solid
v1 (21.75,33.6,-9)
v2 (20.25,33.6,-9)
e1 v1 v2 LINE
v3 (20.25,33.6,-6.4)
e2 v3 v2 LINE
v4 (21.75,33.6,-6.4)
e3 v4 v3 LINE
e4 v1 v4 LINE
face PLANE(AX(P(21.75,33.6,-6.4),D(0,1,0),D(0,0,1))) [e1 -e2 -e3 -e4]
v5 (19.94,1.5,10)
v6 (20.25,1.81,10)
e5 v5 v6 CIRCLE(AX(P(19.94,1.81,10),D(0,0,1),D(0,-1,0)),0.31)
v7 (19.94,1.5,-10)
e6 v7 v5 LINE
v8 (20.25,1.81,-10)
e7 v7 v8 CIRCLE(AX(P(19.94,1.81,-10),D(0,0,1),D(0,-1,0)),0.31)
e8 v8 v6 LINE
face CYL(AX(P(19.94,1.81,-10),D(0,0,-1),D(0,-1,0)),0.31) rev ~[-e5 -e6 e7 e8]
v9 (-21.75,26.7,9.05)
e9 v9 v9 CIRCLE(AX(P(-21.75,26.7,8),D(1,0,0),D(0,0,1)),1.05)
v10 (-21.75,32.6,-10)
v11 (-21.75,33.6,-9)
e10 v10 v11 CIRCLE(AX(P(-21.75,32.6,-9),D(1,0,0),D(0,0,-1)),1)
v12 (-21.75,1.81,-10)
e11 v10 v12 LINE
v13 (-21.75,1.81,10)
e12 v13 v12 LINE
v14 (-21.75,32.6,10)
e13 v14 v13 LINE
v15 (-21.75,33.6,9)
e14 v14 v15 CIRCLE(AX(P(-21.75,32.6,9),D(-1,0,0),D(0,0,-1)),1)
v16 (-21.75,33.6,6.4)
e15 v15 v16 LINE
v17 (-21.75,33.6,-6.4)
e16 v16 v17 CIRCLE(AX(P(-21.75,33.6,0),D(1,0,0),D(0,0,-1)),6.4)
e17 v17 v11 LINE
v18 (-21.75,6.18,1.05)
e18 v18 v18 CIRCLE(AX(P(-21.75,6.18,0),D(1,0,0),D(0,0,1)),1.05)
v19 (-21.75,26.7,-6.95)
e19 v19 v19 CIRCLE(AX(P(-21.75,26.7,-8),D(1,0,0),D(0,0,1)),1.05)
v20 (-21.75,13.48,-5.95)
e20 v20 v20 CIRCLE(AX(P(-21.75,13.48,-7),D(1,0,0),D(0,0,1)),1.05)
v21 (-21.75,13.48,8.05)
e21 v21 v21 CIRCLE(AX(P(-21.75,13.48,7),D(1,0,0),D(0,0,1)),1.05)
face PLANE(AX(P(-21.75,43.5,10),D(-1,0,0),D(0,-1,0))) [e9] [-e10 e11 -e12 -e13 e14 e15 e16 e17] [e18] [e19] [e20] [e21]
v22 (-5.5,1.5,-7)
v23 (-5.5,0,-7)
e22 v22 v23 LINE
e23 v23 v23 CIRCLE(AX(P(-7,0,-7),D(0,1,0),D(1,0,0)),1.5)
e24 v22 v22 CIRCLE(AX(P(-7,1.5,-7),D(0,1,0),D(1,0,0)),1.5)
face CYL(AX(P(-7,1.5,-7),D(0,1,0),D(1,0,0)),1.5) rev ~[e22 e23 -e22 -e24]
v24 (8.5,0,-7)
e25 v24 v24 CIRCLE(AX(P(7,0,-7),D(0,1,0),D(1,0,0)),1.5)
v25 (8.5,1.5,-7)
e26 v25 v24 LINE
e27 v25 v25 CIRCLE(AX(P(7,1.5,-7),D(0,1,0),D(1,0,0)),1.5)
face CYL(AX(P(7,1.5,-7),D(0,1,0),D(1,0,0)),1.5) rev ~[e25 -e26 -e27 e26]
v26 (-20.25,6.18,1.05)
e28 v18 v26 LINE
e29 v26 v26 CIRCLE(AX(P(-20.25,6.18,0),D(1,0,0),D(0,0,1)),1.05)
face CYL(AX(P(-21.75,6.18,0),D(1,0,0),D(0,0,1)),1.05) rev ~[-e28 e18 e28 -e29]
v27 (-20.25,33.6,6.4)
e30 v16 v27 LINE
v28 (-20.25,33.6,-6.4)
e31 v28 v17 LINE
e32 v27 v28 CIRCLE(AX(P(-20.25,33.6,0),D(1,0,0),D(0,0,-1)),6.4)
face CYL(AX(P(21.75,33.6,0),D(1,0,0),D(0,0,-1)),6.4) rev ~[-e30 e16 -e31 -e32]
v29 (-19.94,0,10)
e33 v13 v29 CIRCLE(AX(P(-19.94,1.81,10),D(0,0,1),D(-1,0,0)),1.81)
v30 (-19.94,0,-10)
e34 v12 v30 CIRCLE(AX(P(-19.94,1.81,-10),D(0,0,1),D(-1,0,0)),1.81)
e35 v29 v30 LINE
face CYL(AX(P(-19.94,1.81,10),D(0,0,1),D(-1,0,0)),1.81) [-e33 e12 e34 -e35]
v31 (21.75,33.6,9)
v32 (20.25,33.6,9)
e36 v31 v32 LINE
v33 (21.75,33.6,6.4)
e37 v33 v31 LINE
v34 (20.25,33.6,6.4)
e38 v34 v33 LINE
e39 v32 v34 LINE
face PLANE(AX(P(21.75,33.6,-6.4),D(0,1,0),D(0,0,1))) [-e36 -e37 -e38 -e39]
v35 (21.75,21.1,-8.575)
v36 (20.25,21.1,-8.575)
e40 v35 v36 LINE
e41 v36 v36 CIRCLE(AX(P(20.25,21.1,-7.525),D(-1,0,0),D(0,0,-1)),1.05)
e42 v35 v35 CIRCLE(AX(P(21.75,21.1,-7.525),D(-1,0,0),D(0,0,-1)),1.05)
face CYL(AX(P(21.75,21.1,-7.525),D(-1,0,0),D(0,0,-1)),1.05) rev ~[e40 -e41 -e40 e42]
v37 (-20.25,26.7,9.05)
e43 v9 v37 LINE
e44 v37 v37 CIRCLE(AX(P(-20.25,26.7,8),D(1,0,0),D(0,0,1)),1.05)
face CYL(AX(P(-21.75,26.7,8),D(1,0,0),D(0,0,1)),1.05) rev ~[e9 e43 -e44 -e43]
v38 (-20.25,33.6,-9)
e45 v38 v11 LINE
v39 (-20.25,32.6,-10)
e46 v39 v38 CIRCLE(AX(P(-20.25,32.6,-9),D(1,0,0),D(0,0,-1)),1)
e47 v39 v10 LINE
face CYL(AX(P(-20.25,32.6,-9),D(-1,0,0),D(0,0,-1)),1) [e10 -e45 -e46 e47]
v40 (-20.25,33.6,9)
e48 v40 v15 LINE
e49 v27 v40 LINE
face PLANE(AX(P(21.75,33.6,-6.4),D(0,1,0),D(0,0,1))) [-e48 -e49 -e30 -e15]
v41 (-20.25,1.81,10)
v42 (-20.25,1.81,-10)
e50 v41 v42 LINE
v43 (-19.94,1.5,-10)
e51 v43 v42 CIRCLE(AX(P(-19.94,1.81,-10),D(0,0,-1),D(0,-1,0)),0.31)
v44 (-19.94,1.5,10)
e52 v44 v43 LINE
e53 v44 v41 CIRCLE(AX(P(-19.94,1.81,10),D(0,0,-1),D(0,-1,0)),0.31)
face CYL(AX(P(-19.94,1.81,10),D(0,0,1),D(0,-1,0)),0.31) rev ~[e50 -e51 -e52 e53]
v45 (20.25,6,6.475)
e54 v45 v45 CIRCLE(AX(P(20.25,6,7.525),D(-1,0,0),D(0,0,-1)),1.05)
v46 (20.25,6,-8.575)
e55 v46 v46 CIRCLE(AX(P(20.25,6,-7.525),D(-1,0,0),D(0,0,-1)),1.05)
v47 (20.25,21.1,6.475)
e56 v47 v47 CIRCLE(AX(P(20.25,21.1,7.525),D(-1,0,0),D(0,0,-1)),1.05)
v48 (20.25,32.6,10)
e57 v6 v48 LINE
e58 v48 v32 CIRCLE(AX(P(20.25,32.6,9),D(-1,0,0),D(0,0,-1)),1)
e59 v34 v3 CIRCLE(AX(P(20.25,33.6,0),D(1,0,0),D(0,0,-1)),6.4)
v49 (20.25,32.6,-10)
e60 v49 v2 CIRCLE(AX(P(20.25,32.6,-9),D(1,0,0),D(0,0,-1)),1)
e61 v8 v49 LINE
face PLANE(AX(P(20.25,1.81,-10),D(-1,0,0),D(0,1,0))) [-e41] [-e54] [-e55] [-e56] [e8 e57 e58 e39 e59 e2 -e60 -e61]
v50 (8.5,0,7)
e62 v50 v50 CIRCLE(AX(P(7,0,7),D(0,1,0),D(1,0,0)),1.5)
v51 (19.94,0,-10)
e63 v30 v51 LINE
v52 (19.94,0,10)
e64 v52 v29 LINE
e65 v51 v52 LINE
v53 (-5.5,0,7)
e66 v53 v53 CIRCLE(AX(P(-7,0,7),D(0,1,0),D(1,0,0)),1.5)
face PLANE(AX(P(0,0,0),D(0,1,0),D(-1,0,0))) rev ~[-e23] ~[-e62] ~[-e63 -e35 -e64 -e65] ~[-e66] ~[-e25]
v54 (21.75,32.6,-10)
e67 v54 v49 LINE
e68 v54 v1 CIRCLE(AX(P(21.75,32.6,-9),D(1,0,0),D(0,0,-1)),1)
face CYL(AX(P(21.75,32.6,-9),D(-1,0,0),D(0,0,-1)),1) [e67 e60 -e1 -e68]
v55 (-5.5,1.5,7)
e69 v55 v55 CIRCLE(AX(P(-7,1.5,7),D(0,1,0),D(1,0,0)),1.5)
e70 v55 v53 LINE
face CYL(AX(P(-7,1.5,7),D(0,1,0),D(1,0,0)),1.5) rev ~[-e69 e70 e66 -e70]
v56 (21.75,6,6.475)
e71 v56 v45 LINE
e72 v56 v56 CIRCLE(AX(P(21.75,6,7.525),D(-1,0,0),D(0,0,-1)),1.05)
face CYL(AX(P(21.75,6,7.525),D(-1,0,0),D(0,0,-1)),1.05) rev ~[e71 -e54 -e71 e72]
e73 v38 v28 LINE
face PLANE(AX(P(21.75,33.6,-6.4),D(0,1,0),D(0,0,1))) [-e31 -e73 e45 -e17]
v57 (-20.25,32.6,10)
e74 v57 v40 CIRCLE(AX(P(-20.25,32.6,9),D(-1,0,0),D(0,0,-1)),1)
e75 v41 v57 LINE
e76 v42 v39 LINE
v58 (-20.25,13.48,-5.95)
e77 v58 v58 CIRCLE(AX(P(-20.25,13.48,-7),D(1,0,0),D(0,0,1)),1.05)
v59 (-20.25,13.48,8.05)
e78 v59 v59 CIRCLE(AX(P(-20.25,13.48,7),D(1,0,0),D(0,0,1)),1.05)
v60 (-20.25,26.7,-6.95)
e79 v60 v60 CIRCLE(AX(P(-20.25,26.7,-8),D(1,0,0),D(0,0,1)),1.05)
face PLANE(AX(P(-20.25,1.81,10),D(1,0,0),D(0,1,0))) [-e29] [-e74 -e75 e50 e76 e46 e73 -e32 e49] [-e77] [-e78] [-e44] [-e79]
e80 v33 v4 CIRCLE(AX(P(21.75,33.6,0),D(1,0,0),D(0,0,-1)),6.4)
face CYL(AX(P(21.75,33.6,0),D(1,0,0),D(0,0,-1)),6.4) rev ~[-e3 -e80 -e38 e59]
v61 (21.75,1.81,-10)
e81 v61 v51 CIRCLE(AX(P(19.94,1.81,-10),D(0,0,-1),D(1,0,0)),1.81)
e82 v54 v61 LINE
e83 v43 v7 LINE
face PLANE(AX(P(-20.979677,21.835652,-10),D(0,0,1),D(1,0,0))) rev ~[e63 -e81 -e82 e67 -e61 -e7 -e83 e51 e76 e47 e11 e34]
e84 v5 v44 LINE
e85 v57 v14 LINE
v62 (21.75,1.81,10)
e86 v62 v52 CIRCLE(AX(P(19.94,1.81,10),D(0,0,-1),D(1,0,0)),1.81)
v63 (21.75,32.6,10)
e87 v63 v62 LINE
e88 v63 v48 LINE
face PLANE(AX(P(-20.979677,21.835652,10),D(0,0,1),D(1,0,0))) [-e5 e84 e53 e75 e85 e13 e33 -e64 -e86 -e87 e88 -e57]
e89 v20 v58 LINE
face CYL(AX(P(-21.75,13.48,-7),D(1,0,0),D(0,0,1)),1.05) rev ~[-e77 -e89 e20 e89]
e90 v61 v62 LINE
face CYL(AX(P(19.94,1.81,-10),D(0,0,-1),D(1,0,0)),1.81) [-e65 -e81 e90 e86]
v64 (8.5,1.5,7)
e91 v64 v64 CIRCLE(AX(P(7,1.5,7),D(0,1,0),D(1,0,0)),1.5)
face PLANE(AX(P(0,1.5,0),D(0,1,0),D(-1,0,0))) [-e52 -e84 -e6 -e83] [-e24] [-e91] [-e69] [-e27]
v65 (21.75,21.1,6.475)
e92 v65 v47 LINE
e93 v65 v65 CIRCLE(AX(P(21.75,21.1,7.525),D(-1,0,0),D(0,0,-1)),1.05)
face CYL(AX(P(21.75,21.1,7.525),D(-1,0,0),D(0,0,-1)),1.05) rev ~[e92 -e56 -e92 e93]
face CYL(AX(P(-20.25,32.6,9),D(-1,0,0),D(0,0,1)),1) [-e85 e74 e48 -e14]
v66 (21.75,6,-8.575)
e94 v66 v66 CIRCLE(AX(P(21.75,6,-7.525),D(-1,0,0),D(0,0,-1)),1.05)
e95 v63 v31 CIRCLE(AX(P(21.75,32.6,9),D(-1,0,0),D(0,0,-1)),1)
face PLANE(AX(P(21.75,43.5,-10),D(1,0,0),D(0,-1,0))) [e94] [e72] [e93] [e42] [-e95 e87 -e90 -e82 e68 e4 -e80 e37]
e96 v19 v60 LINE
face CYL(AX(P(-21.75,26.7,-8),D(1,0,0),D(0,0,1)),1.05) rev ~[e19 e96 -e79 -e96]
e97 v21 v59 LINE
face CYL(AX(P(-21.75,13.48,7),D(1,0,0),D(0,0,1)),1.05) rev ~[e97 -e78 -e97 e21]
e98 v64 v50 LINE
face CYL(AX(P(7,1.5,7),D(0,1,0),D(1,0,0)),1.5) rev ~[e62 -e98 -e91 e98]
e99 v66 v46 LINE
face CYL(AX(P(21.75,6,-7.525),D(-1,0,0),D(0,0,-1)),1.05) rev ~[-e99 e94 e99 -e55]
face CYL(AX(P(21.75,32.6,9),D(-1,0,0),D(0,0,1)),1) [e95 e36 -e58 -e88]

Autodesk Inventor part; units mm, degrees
ref_plane "YZ Plane" through (0, 0, 0) normal (1, 0, 0) x (0, 1, 0)
ref_plane "XZ Plane" through (0, 0, 0) normal (0, 1, 0) x (-1, 0, 0)
ref_plane "XY Plane" through (0, 0, 0) normal (0, 0, 1) x (1, 0, 0)
sketch "Sketch1" plane through (0, 0, 0) normal (0, 1, 0) x (-1, 0, 0)
  line L0 (20.25, -10) -> (-20.25, -10)
  line L1 (-20.25, -10) -> (-20.25, 10)
  line L2 (-20.25, 10) -> (20.25, 10)
  line L3 (20.25, 10) -> (20.25, -10)
  point P0 (0, 0)
  dimension "d0" = 40.5
  dimension "d1" = 20
  dimension "d2" = 10
  dimension "d3" = 20.25
extrude "Plate1" add sketch "Sketch1" along normal blind 1.5
sketch "Sketch2" plane through (21.75, 0, -10) normal (-1, 0, 0) x (0, -1, 0)
  line L0 (0, 20) -> (0, 0)
  line L1 (0, 0) -> (-43.5, 0)
  line L2 (-43.5, 0) -> (-43.5, 20)
  line L3 (-43.5, 20) -> (0, 20)
edge flange "Flange1" height 43.5 angle 90 thickness 1.5 bend radius 0.31 thickness toward (-1, 0, 0) relief tear relief width 1.5 relief depth 0.75 edges at (20.25, 1.5, 0) wall of the first edge with corners at (21.75, 0, 10) (21.75, 0, -10) (21.75, 43.5, -10) (21.75, 43.5, 10)
bend "Bend1"
corner "Corner1"
sketch "Sketch3" plane through (-21.75, 0, 10) normal (1, 0, 0) x (0, 1, 0)
  line L0 (0, -20) -> (0, 0)
  line L1 (0, 0) -> (43.5, 0)
  line L2 (43.5, 0) -> (43.5, -20)
  line L3 (43.5, -20) -> (0, -20)
edge flange "Flange2" height 43.5 angle 90 thickness 1.5 bend radius 0.31 thickness toward (1, 0, 0) relief tear relief width 1.5 relief depth 0.75 edges at (-20.25, 1.5, 0) wall of the first edge with corners at (-21.75, 0, -10) (-21.75, 0, 10) (-21.75, 43.5, 10) (-21.75, 43.5, -10)
bend "Bend2"
corner "Corner2"
sketch "Sketch4" plane through (21.75, 43.5, 10) normal (1, 0, 0) x (0, 0, -1)
  circle A0 centre (10, -9.9) radius 6.4
  line L0 (0, 0) -> (20, 0) projected
  line L1 (20, 0) -> (20, -41.69) projected
  point P0 (10, -43.5)
  dimension "d25" = 9.9
  dimension "d26" = 12.8
  dimension "d27" = 10
extrude "Extrusion1" cut sketch "Sketch4" against normal blind 50
sketch "Sketch5" plane through (21.75, 43.5, 10) normal (1, 0, 0) x (0, 0, -1)
  circle A0 centre (10, -9.9) radius 6.4 projected
  line L0 (0, 0) -> (20, 0) projected
  line L1 (-4, 0) -> (24, 0)
  line L2 (24, 0) -> (24, -9.9)
  line L3 (24, -9.9) -> (-4, -9.9)
  line L4 (-4, -9.9) -> (-4, 0)
  line L5 (0, -41.69) -> (0, 0) projected
  point P0 (10, -43.5)
  point P1 (20, 0)
  dimension "d30" = 9.9
  dimension "d31" = 28
  dimension "d32" = 4
extrude "Extrusion2" cut sketch "Sketch5" against normal blind 50 contours L3 A0 | A0 L3 L5 L0 L1 L2 | L3 L4 L1 L5 picked at (9.2435, -7.9053)
fillet "Fillet1" radius 1 4 edges at (-21, 33.6, 10) (-21, 33.6, -10) (21, 33.6, -10) (21, 33.6, 10)
sketch "Sketch11" plane through (0, 1.5, 0) normal (0, 1, 0) x (1, 0, 0)
  circle A0 centre (7, 7) radius 1.5
  line L0 (-19.94, 10) -> (19.94, 10) projected
  line L1 (-19.94, 10) -> (-19.94, -10) projected
  circle A1 centre (-7, 7) radius 1.5
  circle A2 centre (7, -7) radius 1.5
  circle A3 centre (-7, -7) radius 1.5
  point P0 (0, 0)
  dimension "d71" = 7
  dimension "d72" = 3
  dimension "d73" = 7
  dimension "d76" = 14
  dimension "d79" = 14
extrude "Extrusion3" cut sketch "Sketch11" against normal through all
sketch "Sketch12" plane through (-21.75, 1.81, -10) normal (-1, 0, 0) x (0, 0, 1)
  circle A0 centre (18, 24.89) radius 0.7835
  circle A1 centre (10, 24.79) radius 0.7835
  circle A2 centre (17, 11.67) radius 0.7835
  circle A3 centre (3, 11.67) radius 0.7835
  circle A4 centre (10, 4.37) radius 0.7835
  circle A5 centre (2, 24.89) radius 0.7835
  point P0 (10, -1.81)
hole "Hole6" at (-21.75, 26.7, -8) at (-21.75, 26.7, 8) at (-21.75, 13.48, 7) at (-21.75, 6.18, 0) at (-21.75, 13.48, -7) direction (1, 0, 0) diameter 2.1 depth 1.5
sketch "Sketch13" plane through (21.75, 1.81, 10) normal (1, 0, 0) x (0, 0, -1)
  circle A0 centre (17.525, 4.19) radius 0.7835
  circle A1 centre (2.475, 4.19) radius 0.7835
  circle A2 centre (2.475, 19.29) radius 0.7835
  circle A3 centre (17.525, 19.29) radius 0.7835
  point P0 (10, -1.81)
hole "Hole7" at (21.75, 21.1, 7.525) at (21.75, 21.1, -7.525) at (21.75, 6, -7.525) at (21.75, 6, 7.525) direction (-1, 0, 0) diameter 2.1 depth 1.5
equation "\"d89\" = Thickness"
equation "\"d96\" = Thickness"
equation "\"d4\" = Thickness"
equation "\"d5\" = BendReliefWidth"
equation "\"d6\" = BendReliefDepth"
equation "\"d7\" = MinimumRemnant"
equation "\"d8\" = TransitionRadius"
equation "\"d11\" = BendRadius"
equation "\"d12\" = CornerReliefSize"
equation "\"d13\" = GapSize"
equation "\"d14\" = JacobiRadiusSize"
equation "\"d15\" = BendReliefWidth"
equation "\"d16\" = BendReliefDepth"
equation "\"d17\" = MinimumRemnant"
equation "\"d18\" = TransitionRadius"
equation "\"d21\" = BendRadius"
equation "\"d22\" = CornerReliefSize"
equation "\"d23\" = GapSize"
equation "\"d24\" = JacobiRadiusSize"
equation "\"BendReliefWidth\" = Thickness"
equation "\"BendReliefDepth\" = 0.5 * Thickness"
equation "\"CornerReliefSize\" = 4 * Thickness"
equation "\"MinimumRemnant\" = 2 * Thickness"
equation "\"TransitionRadius\" = BendRadius"
equation "\"JacobiRadiusSize\" = BendRadius"
equation "\"GapSize\" = Thickness"
equation "\"Thickness\" = 1.5"
equation "\"BendRadius\" = 0.31"
properties part number "axis_10_top_frame" material "Aluminum 6061-AHC"
